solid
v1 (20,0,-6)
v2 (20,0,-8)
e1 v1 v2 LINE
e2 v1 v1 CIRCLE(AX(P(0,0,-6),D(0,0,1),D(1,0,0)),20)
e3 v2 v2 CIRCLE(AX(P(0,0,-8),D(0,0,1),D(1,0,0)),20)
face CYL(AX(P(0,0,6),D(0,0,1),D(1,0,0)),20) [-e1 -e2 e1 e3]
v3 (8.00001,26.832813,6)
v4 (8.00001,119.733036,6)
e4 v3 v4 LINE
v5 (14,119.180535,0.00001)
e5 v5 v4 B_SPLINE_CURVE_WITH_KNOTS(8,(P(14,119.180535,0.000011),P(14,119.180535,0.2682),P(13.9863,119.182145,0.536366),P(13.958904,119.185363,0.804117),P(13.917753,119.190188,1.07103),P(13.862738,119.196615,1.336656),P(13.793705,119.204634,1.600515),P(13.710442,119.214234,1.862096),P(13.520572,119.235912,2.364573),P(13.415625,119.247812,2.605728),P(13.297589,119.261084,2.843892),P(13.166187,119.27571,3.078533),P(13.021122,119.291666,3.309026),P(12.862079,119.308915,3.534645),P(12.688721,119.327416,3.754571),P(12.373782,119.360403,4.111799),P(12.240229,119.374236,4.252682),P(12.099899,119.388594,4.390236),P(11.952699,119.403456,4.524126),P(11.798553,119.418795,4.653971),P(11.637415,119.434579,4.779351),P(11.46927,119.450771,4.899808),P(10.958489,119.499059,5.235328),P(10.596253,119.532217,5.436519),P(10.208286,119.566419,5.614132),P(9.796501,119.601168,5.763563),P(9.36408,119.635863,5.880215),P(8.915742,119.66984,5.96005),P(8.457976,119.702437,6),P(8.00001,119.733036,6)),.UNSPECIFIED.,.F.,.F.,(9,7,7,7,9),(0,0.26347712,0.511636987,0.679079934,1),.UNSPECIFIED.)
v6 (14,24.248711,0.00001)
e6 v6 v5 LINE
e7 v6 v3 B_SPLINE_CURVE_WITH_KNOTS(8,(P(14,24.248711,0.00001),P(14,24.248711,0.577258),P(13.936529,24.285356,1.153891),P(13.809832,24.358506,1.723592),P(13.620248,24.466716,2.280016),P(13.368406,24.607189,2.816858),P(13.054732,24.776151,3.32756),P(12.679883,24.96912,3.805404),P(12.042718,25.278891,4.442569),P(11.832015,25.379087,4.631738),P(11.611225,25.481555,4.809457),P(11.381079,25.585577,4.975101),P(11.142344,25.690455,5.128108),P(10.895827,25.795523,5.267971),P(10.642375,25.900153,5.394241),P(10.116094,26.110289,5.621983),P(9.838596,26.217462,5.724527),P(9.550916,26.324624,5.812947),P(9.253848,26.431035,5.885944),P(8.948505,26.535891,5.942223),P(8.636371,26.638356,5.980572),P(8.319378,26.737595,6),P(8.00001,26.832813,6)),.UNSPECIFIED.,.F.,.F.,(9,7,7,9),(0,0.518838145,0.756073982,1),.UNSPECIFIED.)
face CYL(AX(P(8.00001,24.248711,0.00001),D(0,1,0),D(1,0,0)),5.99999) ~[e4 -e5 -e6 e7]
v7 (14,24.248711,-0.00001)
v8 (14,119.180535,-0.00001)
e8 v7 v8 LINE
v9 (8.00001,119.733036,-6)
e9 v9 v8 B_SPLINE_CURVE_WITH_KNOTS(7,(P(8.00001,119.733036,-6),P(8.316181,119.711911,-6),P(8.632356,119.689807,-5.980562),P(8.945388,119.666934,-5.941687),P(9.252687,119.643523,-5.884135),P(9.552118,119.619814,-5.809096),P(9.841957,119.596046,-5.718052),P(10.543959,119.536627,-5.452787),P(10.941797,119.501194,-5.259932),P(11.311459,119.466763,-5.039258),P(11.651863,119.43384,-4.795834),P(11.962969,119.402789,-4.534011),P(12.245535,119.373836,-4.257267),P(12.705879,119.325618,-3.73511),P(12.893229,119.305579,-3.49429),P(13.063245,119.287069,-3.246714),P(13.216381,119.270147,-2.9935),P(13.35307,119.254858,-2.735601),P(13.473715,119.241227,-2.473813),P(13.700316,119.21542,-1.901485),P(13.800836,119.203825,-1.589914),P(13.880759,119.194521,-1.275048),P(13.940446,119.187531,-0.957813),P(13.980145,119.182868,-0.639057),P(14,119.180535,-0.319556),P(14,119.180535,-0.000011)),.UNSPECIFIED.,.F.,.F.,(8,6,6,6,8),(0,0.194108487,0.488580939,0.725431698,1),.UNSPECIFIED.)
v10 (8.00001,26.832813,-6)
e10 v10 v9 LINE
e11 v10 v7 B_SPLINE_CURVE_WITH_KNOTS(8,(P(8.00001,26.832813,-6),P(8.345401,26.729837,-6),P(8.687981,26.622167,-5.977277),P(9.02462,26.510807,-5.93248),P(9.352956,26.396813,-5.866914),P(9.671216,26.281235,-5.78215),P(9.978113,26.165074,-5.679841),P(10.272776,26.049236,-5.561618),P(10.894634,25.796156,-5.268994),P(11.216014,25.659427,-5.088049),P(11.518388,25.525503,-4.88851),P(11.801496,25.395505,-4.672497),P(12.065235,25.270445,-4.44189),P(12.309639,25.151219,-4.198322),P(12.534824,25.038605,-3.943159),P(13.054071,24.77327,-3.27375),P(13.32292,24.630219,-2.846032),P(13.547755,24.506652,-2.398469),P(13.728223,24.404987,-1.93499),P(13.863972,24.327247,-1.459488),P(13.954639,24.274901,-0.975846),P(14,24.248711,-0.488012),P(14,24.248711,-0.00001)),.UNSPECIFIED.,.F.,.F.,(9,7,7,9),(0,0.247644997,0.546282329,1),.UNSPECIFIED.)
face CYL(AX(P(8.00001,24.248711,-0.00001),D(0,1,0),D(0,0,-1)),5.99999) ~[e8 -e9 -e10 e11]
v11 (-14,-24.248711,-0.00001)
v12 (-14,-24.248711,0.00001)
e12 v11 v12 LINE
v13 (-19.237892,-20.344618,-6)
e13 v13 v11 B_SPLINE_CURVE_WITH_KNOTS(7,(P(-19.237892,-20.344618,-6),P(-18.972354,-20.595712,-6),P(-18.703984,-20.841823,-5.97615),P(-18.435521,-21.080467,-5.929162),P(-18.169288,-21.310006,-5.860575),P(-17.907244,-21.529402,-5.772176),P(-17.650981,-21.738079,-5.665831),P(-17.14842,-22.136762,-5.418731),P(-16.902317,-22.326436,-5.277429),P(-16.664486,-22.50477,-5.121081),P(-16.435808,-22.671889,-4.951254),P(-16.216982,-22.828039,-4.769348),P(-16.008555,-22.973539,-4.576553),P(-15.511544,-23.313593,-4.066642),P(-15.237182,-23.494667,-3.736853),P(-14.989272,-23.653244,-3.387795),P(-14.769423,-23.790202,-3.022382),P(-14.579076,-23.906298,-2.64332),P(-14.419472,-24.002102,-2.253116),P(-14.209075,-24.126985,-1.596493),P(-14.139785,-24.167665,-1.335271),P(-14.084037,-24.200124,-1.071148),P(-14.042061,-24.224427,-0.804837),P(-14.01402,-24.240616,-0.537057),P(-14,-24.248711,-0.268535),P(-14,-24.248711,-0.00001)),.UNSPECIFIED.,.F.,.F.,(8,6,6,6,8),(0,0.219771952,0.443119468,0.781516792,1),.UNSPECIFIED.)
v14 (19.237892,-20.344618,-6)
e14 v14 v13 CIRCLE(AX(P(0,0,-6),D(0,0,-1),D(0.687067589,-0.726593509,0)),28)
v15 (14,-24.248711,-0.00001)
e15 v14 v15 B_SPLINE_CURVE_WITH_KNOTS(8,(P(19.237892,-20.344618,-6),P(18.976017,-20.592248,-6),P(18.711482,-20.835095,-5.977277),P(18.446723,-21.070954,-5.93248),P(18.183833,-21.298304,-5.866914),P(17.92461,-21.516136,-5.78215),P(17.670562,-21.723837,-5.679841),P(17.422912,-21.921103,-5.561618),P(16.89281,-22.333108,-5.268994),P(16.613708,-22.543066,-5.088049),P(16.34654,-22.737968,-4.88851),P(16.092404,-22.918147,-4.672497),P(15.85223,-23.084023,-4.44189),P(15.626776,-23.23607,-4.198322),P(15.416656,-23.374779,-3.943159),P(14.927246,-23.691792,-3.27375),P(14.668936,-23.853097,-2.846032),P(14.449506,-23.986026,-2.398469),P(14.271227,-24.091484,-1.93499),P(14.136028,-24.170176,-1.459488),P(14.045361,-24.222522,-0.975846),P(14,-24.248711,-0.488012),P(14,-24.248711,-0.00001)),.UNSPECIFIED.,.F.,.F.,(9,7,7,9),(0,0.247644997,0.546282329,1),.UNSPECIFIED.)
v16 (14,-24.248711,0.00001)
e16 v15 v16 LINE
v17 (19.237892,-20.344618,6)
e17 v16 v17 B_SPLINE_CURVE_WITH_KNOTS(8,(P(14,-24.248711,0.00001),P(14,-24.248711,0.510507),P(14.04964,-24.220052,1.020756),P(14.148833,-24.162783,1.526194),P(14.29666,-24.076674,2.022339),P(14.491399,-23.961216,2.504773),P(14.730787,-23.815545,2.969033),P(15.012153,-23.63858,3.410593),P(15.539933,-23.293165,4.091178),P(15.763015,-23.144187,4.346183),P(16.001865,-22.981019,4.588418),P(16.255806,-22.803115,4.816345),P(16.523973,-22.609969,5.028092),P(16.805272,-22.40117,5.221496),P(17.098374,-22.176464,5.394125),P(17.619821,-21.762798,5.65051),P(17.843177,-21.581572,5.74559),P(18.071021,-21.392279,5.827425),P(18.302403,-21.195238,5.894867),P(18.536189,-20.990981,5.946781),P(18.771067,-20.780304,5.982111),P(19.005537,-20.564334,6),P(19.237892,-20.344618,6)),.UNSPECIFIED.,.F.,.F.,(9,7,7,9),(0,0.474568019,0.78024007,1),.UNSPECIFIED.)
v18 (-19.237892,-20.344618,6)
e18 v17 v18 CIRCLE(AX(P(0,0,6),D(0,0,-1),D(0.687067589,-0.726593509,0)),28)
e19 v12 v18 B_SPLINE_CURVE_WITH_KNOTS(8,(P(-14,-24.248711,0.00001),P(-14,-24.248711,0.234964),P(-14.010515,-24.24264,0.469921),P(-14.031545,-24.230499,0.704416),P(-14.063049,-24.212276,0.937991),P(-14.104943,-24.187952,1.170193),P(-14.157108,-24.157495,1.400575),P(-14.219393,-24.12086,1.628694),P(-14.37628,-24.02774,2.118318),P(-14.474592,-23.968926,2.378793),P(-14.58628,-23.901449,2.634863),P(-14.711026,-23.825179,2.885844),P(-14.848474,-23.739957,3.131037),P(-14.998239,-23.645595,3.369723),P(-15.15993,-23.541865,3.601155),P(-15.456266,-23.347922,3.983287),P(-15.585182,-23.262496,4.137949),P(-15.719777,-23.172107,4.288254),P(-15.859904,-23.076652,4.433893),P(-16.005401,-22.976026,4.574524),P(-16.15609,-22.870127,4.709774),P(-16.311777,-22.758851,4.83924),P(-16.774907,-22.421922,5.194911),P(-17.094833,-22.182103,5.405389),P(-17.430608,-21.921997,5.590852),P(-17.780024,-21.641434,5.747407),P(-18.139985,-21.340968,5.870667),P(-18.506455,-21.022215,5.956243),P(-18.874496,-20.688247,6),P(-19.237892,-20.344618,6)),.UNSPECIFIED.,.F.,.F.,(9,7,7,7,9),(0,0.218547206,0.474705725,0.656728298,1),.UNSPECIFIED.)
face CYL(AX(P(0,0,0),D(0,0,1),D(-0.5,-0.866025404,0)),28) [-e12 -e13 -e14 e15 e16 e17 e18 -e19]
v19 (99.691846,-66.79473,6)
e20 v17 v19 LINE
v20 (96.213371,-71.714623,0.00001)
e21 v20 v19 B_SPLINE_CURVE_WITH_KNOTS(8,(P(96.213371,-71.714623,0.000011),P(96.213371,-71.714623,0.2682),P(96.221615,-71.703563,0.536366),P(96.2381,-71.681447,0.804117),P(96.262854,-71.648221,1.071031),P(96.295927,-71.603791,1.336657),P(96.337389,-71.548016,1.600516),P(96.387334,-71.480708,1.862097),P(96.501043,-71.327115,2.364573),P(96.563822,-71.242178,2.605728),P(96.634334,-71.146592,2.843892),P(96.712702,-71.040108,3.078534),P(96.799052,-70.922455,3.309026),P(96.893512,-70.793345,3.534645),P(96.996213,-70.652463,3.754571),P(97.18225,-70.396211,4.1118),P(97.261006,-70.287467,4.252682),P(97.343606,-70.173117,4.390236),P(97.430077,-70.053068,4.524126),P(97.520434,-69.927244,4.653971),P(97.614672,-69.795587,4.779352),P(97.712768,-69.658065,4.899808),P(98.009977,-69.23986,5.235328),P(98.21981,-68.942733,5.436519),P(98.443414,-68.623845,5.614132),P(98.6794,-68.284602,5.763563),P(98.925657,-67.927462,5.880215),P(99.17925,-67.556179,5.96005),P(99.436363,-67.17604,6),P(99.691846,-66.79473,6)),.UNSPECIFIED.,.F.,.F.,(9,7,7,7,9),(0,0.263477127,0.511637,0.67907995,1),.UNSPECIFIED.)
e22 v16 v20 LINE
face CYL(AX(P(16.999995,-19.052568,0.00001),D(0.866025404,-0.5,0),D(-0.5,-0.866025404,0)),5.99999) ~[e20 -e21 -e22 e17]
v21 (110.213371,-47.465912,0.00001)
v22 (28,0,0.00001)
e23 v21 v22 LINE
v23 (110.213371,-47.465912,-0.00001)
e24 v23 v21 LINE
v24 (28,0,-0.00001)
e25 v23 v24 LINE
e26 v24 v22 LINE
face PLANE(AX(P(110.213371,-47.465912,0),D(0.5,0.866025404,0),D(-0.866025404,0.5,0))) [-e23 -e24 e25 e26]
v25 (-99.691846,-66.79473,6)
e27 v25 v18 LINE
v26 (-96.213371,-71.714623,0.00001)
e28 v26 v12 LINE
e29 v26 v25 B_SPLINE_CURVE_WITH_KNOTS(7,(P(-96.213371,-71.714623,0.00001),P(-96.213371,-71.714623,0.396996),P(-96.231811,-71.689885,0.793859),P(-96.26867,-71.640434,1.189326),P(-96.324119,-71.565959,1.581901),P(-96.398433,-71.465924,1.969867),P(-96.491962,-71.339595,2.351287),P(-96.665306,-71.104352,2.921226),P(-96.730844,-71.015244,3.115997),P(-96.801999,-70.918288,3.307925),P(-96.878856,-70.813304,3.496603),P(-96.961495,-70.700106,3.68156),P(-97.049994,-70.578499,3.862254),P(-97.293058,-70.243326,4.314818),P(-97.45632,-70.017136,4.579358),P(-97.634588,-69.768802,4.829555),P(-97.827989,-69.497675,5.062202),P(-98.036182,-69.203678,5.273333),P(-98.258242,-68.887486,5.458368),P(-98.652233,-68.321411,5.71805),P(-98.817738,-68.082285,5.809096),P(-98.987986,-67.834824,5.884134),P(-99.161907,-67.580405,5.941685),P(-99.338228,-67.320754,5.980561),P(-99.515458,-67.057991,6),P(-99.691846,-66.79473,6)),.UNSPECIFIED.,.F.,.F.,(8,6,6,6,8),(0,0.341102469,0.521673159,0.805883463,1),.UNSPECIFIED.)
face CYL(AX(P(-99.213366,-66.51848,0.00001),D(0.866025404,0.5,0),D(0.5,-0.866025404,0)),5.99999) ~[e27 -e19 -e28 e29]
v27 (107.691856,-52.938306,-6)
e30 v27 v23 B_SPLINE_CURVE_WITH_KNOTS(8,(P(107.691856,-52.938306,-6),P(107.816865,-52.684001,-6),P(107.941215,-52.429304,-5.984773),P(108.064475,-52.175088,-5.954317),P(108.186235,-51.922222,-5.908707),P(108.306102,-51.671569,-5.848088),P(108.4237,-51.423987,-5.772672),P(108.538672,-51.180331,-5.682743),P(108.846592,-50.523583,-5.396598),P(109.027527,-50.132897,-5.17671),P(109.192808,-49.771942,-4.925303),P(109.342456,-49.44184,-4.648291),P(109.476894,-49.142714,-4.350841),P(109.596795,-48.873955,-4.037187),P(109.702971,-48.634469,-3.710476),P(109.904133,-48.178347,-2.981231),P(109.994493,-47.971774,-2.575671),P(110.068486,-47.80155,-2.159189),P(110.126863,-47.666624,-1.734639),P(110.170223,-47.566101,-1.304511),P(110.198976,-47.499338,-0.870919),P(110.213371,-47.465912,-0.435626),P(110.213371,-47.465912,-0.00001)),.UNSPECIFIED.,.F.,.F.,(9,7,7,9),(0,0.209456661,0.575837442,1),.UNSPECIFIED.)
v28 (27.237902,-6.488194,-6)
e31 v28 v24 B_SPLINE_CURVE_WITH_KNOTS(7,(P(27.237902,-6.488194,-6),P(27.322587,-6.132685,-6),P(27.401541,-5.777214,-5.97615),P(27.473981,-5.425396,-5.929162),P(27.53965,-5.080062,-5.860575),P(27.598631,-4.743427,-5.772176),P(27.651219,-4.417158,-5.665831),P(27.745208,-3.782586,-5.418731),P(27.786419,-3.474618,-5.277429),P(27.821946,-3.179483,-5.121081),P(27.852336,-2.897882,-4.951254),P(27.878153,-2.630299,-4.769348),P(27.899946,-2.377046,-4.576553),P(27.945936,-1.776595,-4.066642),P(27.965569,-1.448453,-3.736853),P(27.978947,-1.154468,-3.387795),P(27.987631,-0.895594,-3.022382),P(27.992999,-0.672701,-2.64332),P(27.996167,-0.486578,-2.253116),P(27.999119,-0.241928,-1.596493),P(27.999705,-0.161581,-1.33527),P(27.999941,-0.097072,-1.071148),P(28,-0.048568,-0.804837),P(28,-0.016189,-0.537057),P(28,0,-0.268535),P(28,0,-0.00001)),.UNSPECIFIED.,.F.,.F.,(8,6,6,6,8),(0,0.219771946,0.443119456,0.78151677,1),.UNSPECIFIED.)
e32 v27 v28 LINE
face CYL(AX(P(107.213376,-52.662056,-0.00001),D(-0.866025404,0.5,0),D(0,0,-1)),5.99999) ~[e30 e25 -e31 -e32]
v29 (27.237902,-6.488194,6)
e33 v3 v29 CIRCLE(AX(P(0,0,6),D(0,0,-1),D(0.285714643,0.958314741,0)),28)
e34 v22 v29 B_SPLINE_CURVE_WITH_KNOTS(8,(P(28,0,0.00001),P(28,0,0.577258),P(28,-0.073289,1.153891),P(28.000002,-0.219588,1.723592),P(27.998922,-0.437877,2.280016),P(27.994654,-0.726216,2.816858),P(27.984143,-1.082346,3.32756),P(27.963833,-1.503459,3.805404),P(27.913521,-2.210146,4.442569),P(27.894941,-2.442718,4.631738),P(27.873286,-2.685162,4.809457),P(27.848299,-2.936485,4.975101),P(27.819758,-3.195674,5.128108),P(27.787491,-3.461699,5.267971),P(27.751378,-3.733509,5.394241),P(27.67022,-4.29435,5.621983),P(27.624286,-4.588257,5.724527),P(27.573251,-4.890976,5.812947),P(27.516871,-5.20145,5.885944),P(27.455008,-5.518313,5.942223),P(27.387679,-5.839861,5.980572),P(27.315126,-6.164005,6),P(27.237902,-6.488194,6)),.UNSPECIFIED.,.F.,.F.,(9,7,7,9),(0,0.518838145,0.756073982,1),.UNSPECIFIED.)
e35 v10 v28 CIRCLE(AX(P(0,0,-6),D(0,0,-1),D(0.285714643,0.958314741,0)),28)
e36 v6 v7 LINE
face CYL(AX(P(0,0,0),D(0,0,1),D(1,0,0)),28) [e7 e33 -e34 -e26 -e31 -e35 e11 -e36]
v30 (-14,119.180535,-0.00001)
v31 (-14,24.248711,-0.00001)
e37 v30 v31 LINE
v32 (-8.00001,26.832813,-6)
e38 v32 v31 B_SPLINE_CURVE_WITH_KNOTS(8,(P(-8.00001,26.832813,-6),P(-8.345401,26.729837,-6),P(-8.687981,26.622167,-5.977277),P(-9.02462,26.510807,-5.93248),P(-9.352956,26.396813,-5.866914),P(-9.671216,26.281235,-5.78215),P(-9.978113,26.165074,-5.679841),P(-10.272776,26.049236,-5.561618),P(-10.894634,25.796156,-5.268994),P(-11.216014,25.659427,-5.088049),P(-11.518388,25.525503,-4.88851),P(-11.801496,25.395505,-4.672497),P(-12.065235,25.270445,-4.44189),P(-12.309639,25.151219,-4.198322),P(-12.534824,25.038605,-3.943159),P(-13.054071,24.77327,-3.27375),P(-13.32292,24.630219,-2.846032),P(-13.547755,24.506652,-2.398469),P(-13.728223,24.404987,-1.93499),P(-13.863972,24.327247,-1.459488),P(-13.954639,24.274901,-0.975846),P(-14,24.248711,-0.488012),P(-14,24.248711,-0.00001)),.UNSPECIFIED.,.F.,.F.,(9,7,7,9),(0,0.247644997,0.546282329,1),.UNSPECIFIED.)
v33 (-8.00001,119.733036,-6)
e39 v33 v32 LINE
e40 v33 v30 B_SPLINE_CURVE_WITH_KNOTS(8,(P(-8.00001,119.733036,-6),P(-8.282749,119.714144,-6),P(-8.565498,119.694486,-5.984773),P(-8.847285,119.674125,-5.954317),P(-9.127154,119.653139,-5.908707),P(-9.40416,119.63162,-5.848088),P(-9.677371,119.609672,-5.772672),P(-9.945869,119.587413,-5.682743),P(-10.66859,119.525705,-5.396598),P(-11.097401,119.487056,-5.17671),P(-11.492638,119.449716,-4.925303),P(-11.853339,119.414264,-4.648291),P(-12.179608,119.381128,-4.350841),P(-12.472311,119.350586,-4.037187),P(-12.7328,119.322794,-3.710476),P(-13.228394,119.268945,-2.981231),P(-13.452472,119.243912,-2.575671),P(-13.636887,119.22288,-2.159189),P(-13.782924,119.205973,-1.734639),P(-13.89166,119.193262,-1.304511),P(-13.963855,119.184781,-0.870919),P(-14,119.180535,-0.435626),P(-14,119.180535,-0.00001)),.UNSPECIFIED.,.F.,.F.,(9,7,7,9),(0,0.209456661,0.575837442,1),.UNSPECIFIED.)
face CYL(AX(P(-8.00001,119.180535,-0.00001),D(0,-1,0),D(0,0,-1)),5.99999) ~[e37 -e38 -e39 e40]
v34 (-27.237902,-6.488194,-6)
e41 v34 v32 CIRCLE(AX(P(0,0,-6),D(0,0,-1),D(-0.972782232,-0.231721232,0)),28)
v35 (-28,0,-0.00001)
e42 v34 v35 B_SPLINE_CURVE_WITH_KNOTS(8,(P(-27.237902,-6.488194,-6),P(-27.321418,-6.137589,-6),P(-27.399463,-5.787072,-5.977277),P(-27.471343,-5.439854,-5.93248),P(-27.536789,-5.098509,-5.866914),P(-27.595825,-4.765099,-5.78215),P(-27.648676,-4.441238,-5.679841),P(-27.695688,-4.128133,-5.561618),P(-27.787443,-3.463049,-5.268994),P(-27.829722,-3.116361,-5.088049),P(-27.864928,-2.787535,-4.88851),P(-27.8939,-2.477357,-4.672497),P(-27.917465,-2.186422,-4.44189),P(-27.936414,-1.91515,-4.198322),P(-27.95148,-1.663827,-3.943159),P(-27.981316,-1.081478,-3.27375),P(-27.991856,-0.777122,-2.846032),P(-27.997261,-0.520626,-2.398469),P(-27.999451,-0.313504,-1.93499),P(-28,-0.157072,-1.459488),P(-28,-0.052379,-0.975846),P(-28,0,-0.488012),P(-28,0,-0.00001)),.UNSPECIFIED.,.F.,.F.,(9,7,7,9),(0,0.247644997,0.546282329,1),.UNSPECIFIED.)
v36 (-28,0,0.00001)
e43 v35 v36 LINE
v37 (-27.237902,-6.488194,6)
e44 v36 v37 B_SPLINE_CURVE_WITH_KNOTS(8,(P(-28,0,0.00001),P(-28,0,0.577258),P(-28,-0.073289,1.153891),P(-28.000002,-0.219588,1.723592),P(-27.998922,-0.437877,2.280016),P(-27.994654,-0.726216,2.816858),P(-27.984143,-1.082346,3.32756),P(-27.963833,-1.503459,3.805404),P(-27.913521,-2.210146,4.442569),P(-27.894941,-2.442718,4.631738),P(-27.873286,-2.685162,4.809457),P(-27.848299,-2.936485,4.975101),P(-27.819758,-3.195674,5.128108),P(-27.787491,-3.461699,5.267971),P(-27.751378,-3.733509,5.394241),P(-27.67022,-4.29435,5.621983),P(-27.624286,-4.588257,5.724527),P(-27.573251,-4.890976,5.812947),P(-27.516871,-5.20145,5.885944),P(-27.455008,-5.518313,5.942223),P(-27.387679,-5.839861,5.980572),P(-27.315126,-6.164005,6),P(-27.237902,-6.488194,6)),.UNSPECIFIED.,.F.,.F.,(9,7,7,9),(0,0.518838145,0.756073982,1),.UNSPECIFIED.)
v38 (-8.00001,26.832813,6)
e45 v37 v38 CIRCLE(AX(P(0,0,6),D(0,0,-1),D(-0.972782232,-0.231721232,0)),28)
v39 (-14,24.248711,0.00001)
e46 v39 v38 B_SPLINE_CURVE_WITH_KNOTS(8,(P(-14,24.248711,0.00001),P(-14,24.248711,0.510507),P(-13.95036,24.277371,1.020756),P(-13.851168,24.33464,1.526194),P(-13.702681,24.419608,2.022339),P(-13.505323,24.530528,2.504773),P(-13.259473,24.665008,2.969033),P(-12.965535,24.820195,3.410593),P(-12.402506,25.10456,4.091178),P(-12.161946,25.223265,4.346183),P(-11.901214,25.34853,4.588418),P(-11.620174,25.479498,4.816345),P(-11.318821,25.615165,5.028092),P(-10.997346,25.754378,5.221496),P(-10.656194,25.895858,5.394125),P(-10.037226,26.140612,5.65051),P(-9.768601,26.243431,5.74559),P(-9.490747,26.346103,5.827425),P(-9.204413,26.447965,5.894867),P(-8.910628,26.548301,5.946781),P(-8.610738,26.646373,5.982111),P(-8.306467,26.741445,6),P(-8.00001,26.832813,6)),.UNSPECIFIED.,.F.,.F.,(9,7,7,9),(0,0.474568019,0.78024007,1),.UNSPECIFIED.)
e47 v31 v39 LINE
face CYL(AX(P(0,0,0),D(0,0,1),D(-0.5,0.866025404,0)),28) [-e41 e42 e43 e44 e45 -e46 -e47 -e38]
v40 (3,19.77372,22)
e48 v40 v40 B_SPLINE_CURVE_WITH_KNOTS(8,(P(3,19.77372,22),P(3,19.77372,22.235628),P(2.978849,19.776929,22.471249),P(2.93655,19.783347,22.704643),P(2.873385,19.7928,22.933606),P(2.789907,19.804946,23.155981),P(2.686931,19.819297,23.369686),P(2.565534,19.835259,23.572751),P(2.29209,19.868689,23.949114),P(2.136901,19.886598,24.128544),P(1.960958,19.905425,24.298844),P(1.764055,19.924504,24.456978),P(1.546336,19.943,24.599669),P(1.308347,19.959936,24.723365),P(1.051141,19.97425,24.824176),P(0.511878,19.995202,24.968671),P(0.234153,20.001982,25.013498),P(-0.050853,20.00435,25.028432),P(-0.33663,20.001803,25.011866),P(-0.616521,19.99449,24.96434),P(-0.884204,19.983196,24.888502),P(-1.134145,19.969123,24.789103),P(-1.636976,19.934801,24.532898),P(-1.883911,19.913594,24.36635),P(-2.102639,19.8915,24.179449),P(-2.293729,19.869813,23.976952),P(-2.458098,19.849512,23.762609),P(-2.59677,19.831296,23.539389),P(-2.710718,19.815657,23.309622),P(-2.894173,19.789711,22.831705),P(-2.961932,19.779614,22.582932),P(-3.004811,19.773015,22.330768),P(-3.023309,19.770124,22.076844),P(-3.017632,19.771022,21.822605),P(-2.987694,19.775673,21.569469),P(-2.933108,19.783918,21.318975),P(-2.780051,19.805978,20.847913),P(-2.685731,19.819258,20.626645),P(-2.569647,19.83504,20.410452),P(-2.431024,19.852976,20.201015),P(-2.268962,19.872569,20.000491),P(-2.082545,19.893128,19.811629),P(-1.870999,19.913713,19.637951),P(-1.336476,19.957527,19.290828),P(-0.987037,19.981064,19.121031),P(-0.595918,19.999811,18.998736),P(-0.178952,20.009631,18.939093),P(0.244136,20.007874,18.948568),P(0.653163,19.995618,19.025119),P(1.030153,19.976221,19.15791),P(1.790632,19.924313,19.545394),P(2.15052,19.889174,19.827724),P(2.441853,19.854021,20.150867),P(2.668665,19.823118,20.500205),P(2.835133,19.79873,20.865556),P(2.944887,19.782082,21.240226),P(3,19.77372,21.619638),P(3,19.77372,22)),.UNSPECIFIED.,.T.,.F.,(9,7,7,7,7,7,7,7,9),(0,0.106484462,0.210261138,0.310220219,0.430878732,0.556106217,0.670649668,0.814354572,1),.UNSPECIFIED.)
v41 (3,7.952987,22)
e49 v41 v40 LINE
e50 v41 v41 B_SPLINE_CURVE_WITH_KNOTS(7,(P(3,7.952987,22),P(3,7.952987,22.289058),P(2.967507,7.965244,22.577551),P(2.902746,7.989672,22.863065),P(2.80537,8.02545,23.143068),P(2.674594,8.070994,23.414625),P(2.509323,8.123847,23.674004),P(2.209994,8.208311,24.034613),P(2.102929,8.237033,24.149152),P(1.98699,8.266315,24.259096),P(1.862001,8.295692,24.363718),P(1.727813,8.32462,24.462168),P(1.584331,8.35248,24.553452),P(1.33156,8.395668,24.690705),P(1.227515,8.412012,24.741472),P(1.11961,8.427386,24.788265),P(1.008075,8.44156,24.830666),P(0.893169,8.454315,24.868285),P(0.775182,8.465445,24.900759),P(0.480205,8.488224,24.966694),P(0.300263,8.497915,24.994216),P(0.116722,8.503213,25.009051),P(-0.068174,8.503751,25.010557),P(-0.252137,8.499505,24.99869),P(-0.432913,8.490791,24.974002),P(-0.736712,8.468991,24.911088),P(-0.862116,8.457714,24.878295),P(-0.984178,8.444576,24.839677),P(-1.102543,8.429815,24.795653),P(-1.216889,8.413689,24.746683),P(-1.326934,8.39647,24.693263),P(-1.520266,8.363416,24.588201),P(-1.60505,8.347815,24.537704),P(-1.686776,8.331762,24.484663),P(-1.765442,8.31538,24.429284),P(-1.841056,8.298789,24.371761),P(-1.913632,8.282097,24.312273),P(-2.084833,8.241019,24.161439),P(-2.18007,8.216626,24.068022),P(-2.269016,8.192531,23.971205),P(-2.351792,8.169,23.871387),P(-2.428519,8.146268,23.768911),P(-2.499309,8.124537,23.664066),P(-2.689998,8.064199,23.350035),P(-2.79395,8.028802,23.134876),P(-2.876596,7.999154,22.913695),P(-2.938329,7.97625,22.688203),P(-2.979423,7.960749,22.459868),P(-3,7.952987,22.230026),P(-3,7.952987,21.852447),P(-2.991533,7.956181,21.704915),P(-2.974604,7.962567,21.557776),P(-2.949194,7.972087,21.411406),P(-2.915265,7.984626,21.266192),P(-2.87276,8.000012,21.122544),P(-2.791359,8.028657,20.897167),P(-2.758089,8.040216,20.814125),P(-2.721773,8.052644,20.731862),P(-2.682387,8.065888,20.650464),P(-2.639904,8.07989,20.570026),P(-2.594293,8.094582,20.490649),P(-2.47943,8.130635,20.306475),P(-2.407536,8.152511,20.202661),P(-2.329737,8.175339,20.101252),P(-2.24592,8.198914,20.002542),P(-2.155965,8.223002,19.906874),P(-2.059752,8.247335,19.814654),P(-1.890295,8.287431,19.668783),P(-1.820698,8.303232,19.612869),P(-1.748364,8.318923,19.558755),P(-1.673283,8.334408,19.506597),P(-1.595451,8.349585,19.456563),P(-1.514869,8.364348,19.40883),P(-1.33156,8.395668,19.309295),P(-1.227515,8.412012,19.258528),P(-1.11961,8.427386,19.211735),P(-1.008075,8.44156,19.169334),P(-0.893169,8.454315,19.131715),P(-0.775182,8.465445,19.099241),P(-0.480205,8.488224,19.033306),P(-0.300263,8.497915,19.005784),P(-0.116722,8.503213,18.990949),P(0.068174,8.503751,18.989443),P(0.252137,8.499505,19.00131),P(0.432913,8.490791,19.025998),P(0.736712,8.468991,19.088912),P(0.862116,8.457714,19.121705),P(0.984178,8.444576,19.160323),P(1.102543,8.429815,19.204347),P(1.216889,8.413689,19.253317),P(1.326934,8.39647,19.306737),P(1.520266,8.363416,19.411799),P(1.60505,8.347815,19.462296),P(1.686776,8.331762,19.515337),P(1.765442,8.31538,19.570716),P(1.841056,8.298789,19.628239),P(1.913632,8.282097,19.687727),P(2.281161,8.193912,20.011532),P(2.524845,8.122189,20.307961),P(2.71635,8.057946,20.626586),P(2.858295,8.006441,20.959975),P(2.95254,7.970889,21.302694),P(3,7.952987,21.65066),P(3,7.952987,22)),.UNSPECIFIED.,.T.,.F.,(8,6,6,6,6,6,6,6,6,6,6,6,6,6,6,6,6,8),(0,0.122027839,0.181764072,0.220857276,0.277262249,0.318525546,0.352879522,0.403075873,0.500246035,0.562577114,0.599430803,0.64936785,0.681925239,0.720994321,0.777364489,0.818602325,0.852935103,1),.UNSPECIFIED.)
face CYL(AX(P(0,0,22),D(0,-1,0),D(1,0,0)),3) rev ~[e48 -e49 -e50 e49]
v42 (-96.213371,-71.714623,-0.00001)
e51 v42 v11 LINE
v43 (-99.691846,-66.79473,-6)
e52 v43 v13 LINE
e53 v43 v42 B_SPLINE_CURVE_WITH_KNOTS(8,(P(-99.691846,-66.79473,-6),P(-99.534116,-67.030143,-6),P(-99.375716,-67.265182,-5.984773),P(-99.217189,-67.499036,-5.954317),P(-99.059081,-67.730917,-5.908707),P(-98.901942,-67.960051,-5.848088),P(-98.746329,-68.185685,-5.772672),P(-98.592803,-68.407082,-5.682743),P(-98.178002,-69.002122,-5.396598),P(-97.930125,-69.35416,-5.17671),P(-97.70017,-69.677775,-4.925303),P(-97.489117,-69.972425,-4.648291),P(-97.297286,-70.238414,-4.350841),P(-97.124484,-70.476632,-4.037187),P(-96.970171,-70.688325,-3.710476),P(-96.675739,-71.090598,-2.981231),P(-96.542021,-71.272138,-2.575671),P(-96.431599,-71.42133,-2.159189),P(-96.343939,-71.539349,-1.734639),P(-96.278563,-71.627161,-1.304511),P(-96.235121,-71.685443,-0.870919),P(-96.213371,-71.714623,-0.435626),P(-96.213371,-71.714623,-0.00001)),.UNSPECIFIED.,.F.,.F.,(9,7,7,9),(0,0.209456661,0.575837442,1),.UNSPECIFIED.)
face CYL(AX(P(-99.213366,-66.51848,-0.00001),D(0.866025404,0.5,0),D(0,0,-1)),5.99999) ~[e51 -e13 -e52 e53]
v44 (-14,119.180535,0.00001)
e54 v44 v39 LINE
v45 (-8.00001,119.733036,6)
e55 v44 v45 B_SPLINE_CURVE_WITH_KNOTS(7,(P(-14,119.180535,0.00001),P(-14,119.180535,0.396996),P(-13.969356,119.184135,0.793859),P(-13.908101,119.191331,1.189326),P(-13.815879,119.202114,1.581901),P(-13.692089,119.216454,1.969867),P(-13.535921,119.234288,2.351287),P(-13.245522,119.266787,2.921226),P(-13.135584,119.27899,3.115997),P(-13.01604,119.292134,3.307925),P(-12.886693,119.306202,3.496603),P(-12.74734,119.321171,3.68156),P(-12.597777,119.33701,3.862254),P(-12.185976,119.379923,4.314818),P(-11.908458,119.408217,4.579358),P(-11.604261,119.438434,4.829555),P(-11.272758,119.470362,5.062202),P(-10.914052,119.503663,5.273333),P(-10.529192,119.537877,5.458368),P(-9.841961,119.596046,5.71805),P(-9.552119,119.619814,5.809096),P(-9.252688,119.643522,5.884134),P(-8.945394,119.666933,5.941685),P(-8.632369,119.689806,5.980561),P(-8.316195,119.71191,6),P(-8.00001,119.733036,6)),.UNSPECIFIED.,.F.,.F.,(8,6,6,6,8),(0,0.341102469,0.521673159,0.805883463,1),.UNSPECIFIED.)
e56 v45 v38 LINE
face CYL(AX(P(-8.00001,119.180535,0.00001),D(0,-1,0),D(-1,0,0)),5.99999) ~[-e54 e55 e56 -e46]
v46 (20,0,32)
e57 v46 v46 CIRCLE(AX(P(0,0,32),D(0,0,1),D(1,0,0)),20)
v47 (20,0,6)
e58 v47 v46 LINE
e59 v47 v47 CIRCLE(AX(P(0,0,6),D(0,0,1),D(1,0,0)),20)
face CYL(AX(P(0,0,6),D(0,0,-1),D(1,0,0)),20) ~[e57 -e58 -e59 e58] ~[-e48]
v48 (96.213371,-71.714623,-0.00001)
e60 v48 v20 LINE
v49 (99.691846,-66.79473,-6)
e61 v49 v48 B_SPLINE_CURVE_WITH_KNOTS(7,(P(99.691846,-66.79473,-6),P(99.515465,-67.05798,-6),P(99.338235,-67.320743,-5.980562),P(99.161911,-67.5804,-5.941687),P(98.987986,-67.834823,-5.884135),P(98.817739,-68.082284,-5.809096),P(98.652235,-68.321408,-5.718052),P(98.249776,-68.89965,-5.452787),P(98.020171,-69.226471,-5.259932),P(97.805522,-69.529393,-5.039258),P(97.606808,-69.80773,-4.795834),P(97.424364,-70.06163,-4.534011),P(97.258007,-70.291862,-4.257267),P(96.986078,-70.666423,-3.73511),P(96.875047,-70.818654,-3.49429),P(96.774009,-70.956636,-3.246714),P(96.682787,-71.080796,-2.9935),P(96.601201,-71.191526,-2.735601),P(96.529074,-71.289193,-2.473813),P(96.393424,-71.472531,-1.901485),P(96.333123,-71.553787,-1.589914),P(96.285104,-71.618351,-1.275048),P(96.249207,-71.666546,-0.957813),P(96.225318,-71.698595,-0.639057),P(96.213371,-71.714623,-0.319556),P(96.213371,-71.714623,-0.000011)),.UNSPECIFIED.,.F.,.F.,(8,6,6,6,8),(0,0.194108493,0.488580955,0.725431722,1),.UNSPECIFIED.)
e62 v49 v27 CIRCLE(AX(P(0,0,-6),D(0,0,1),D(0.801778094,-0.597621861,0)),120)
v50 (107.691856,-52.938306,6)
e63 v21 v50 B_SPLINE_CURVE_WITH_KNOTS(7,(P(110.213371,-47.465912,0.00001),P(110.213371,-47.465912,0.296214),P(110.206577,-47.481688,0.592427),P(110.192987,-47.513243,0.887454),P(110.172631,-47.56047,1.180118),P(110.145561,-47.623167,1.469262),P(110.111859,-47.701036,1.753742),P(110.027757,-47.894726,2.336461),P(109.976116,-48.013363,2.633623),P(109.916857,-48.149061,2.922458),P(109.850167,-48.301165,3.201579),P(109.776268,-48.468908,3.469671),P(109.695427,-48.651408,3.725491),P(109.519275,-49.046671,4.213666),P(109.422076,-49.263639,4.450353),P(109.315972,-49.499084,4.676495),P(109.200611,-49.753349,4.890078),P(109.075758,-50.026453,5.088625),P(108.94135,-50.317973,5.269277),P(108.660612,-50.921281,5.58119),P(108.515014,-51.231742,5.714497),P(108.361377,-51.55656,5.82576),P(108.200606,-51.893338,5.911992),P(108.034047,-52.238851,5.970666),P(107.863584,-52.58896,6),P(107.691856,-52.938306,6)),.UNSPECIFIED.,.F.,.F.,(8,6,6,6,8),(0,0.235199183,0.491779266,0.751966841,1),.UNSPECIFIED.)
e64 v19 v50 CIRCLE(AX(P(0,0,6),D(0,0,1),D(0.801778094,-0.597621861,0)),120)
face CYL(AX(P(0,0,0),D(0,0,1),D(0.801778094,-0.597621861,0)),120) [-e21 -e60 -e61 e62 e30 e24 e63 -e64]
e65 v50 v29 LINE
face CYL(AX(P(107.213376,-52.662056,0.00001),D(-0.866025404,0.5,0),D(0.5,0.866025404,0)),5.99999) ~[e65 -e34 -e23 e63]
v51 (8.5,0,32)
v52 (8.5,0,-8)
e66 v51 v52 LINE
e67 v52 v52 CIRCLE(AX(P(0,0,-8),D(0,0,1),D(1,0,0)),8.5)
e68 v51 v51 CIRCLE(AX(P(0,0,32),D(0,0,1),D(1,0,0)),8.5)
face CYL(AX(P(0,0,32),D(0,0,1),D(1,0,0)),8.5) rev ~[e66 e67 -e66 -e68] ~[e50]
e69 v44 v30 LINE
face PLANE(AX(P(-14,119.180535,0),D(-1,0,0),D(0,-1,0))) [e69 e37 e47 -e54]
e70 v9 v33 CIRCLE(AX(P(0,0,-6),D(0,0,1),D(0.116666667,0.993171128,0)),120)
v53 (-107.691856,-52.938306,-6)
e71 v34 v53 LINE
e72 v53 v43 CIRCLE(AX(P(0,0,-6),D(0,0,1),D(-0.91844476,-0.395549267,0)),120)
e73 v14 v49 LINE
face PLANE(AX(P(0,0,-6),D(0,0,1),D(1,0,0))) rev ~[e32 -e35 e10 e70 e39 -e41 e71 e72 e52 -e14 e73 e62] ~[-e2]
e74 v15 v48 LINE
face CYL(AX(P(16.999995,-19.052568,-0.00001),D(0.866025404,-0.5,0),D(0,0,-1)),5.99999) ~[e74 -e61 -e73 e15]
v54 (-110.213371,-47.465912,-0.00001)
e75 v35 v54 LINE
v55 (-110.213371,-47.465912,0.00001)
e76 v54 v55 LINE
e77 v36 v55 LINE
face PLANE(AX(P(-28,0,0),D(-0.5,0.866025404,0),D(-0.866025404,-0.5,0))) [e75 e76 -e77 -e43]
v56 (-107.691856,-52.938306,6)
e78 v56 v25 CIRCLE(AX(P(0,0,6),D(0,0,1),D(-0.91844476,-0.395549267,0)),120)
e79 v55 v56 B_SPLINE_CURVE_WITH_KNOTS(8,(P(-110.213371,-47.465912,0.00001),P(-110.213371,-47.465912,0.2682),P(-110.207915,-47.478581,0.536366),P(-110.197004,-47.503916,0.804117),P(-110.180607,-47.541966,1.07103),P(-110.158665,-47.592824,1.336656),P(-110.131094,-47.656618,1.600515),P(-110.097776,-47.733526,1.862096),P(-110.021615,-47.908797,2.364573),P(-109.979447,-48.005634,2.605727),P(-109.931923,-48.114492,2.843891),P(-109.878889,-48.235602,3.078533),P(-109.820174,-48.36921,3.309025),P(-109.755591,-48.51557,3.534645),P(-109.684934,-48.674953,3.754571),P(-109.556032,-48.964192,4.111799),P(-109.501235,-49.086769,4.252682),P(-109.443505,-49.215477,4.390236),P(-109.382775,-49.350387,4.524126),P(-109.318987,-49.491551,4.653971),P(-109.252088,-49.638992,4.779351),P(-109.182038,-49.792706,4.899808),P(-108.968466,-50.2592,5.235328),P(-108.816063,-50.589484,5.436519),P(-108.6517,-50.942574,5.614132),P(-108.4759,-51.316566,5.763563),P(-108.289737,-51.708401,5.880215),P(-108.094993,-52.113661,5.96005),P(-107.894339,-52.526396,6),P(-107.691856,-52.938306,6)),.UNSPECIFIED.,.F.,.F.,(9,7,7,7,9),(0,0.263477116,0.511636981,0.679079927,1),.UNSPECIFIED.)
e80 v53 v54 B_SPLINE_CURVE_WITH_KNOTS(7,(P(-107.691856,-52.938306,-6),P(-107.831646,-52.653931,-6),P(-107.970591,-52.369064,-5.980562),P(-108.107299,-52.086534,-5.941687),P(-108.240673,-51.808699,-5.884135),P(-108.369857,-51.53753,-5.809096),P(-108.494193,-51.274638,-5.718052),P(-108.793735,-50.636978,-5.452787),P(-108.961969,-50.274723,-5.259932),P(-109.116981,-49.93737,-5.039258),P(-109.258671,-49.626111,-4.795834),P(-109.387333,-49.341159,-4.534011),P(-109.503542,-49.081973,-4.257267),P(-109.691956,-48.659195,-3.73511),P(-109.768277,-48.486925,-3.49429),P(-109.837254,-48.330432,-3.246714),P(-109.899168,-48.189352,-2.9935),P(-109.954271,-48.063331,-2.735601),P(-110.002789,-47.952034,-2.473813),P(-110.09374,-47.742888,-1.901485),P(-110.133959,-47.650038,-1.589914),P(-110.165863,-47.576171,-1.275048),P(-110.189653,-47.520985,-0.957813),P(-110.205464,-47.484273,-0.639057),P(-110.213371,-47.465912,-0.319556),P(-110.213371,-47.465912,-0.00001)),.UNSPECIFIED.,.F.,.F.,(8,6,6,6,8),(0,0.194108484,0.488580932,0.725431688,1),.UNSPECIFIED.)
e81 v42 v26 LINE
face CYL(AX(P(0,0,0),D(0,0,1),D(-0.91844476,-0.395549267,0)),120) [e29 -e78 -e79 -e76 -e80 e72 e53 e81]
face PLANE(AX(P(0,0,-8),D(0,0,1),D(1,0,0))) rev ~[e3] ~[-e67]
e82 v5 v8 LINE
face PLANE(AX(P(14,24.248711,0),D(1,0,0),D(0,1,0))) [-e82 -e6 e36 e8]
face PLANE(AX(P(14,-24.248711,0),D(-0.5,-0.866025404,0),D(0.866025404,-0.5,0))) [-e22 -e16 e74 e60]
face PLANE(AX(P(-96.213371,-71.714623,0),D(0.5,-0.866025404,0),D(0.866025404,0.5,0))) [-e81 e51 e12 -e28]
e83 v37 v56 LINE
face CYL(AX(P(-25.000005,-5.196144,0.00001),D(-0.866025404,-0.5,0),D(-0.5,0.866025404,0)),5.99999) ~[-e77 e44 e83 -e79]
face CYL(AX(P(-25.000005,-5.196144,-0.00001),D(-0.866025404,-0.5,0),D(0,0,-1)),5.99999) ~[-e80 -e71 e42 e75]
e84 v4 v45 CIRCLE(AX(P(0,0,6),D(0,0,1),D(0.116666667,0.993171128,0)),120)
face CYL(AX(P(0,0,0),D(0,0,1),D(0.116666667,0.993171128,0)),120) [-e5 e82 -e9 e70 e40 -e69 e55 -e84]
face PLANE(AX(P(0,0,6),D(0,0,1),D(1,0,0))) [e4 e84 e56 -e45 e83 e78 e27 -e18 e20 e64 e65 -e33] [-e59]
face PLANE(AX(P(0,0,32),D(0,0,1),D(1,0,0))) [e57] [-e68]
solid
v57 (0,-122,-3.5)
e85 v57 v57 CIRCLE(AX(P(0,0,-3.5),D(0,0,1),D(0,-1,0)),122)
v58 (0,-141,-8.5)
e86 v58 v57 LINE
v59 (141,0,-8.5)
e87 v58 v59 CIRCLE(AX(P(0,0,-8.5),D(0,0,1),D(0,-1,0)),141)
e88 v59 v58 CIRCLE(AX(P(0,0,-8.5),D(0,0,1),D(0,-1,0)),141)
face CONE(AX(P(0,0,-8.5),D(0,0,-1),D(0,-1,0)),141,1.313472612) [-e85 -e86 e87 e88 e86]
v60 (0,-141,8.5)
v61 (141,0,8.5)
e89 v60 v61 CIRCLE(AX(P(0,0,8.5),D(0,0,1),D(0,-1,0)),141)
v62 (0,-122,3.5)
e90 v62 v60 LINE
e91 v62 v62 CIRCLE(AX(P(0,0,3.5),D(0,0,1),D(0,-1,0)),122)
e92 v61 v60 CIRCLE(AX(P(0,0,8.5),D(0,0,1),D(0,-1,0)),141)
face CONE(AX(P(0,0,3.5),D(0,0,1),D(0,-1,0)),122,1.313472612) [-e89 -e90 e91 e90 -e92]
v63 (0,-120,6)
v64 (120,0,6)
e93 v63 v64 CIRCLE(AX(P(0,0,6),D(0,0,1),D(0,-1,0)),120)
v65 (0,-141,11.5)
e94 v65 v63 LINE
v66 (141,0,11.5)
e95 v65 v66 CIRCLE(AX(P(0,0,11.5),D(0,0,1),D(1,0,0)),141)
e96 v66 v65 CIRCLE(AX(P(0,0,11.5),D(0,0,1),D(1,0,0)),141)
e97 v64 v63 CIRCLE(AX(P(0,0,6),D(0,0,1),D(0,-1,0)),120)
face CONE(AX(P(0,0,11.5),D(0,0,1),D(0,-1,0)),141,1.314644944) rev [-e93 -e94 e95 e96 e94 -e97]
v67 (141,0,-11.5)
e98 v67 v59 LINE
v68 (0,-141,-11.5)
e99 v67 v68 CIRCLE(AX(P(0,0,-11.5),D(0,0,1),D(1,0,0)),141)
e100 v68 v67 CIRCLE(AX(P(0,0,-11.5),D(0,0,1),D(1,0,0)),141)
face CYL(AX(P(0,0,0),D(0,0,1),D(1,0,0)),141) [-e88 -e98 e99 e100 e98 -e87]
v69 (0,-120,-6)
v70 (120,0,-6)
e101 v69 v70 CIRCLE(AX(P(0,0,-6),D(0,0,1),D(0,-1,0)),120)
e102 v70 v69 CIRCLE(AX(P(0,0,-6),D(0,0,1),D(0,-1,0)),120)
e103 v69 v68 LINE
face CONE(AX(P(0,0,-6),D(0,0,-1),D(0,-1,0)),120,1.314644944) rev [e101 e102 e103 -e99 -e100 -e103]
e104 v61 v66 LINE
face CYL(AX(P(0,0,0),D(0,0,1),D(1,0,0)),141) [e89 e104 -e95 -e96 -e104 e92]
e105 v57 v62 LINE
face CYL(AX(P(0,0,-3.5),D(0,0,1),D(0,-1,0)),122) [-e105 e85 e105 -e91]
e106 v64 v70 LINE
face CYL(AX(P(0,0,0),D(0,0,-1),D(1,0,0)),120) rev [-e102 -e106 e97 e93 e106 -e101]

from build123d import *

# Parameters (mm, degrees)
F0_R          = 141
F0_R_2        = 120
F1_DEPTH      = 11.5
F7_DEPTH      = 6
F8_R          = 20
F9_DEPTH      = 26
F9_DEPTH_BACK = 14
F10_R         = 8.5
F11_DEPTH     = 43.501
F12_R         = 5.99999
F13_R         = 3
F14_DEPTH     = 141.001


# Not quite as in the source:
# - a fillet or chamfer is up to 0.001 mm smaller than in the source, because OpenCascade refuses the exact size


with BuildPart() as f1:
    # F0 (on Top) → F1 (new body, symmetric)
    with BuildSketch(Plane.XY):
        Circle(F0_R)
        Circle(F0_R_2, mode=Mode.SUBTRACT)
    extrude(amount=F1_DEPTH, both=True)

    # F2 (on Right) → F3 (revolve, cut)
    with BuildSketch(Plane.YZ):
        Polygon((-122, 3.5), (-141, 8.5), (-141, -8.5), (-122, -3.5), align=None)
    revolve(axis=Axis((0, 0, 28.2399164939), (0, 0, 1)), mode=Mode.SUBTRACT)

    # F4 (on Right) → F5 (revolve, cut)
    with BuildSketch(Plane.YZ):
        Polygon((-141, 11.5), (-120, 6), (-120, 11.5), align=None)
        Polygon((-120, -6), (-141, -11.5), (-120, -11.5), align=None)
    revolve(axis=Axis((0, 0, 29.001140967), (0, 0, 1)), mode=Mode.SUBTRACT)


with BuildPart() as f7:
    # F6 (on Top) → F7 (new body, symmetric)
    with BuildSketch(Plane.XY):
        with BuildLine():
            Line((-14, 119.1805353235), (-14, 24.248711306))
            ThreePointArc((-14, 24.248711306), (-24.248711306, 14), (-28, 0))
            Line((-28, 0), (-110.2133712268, -47.4659120088))
            ThreePointArc((-110.2133712268, -47.4659120088), (-103.9230484541, -60), (-96.2133712268, -71.7146233147))
            Line((-96.2133712268, -71.7146233147), (-14, -24.248711306))
            ThreePointArc((-14, -24.248711306), (0, -28), (14, -24.248711306))
            Line((14, -24.248711306), (96.2133712268, -71.7146233147))
            ThreePointArc((96.2133712268, -71.7146233147), (103.9230484541, -60), (110.2133712268, -47.4659120088))
            Line((110.2133712268, -47.4659120088), (28, 0))
            ThreePointArc((28, 0), (24.248711306, 14), (14, 24.248711306))
            Line((14, 24.248711306), (14, 119.1805353235))
            ThreePointArc((14, 119.1805353235), (0, 120), (-14, 119.1805353235))
        make_face()
    extrude(amount=F7_DEPTH, both=True)

    # F8 (on face) → F9 (join, two sides)
    with BuildSketch(Plane.XY.offset(6)) as f9_sk:
        Circle(F8_R)
    extrude(amount=F9_DEPTH)
    extrude(f9_sk.sketch, amount=-F9_DEPTH_BACK)

    # F10 (on face) → F11 (cut, through all)
    with BuildSketch(Plane.XY.offset(32)):
        Circle(F10_R)
    extrude(amount=-F11_DEPTH, mode=Mode.SUBTRACT)

    # F12 (radius 6 in the source; OpenCascade refuses exactly that, so slightly less here)
    f12_edges = [f7.edges().sort_by_distance(p)[0] for p in [
        (-14, 71.714623, 6),
        (-14, 71.714623, -6),
        (14, 71.714623, 6),
        (14, 71.714623, -6),
        (69.106686, -23.732956, -6),
        (69.106686, -23.732956, 6),
        (55.106686, -47.981667, 6),
        (55.106686, -47.981667, -6),
        (-55.106686, -47.981667, 6),
        (-55.106686, -47.981667, -6),
        (-69.106686, -23.732956, 6),
        (-69.106686, -23.732956, -6),
    ]]
    fillet(f12_edges, radius=F12_R)

    # F13 (on Front) → F14 (cut, through all)
    with BuildSketch(Plane.XZ):
        with Locations((0, 22)):
            Circle(F13_R)
    extrude(amount=-F14_DEPTH, mode=Mode.SUBTRACT)


solid = Compound([f1.part, f7.part])
